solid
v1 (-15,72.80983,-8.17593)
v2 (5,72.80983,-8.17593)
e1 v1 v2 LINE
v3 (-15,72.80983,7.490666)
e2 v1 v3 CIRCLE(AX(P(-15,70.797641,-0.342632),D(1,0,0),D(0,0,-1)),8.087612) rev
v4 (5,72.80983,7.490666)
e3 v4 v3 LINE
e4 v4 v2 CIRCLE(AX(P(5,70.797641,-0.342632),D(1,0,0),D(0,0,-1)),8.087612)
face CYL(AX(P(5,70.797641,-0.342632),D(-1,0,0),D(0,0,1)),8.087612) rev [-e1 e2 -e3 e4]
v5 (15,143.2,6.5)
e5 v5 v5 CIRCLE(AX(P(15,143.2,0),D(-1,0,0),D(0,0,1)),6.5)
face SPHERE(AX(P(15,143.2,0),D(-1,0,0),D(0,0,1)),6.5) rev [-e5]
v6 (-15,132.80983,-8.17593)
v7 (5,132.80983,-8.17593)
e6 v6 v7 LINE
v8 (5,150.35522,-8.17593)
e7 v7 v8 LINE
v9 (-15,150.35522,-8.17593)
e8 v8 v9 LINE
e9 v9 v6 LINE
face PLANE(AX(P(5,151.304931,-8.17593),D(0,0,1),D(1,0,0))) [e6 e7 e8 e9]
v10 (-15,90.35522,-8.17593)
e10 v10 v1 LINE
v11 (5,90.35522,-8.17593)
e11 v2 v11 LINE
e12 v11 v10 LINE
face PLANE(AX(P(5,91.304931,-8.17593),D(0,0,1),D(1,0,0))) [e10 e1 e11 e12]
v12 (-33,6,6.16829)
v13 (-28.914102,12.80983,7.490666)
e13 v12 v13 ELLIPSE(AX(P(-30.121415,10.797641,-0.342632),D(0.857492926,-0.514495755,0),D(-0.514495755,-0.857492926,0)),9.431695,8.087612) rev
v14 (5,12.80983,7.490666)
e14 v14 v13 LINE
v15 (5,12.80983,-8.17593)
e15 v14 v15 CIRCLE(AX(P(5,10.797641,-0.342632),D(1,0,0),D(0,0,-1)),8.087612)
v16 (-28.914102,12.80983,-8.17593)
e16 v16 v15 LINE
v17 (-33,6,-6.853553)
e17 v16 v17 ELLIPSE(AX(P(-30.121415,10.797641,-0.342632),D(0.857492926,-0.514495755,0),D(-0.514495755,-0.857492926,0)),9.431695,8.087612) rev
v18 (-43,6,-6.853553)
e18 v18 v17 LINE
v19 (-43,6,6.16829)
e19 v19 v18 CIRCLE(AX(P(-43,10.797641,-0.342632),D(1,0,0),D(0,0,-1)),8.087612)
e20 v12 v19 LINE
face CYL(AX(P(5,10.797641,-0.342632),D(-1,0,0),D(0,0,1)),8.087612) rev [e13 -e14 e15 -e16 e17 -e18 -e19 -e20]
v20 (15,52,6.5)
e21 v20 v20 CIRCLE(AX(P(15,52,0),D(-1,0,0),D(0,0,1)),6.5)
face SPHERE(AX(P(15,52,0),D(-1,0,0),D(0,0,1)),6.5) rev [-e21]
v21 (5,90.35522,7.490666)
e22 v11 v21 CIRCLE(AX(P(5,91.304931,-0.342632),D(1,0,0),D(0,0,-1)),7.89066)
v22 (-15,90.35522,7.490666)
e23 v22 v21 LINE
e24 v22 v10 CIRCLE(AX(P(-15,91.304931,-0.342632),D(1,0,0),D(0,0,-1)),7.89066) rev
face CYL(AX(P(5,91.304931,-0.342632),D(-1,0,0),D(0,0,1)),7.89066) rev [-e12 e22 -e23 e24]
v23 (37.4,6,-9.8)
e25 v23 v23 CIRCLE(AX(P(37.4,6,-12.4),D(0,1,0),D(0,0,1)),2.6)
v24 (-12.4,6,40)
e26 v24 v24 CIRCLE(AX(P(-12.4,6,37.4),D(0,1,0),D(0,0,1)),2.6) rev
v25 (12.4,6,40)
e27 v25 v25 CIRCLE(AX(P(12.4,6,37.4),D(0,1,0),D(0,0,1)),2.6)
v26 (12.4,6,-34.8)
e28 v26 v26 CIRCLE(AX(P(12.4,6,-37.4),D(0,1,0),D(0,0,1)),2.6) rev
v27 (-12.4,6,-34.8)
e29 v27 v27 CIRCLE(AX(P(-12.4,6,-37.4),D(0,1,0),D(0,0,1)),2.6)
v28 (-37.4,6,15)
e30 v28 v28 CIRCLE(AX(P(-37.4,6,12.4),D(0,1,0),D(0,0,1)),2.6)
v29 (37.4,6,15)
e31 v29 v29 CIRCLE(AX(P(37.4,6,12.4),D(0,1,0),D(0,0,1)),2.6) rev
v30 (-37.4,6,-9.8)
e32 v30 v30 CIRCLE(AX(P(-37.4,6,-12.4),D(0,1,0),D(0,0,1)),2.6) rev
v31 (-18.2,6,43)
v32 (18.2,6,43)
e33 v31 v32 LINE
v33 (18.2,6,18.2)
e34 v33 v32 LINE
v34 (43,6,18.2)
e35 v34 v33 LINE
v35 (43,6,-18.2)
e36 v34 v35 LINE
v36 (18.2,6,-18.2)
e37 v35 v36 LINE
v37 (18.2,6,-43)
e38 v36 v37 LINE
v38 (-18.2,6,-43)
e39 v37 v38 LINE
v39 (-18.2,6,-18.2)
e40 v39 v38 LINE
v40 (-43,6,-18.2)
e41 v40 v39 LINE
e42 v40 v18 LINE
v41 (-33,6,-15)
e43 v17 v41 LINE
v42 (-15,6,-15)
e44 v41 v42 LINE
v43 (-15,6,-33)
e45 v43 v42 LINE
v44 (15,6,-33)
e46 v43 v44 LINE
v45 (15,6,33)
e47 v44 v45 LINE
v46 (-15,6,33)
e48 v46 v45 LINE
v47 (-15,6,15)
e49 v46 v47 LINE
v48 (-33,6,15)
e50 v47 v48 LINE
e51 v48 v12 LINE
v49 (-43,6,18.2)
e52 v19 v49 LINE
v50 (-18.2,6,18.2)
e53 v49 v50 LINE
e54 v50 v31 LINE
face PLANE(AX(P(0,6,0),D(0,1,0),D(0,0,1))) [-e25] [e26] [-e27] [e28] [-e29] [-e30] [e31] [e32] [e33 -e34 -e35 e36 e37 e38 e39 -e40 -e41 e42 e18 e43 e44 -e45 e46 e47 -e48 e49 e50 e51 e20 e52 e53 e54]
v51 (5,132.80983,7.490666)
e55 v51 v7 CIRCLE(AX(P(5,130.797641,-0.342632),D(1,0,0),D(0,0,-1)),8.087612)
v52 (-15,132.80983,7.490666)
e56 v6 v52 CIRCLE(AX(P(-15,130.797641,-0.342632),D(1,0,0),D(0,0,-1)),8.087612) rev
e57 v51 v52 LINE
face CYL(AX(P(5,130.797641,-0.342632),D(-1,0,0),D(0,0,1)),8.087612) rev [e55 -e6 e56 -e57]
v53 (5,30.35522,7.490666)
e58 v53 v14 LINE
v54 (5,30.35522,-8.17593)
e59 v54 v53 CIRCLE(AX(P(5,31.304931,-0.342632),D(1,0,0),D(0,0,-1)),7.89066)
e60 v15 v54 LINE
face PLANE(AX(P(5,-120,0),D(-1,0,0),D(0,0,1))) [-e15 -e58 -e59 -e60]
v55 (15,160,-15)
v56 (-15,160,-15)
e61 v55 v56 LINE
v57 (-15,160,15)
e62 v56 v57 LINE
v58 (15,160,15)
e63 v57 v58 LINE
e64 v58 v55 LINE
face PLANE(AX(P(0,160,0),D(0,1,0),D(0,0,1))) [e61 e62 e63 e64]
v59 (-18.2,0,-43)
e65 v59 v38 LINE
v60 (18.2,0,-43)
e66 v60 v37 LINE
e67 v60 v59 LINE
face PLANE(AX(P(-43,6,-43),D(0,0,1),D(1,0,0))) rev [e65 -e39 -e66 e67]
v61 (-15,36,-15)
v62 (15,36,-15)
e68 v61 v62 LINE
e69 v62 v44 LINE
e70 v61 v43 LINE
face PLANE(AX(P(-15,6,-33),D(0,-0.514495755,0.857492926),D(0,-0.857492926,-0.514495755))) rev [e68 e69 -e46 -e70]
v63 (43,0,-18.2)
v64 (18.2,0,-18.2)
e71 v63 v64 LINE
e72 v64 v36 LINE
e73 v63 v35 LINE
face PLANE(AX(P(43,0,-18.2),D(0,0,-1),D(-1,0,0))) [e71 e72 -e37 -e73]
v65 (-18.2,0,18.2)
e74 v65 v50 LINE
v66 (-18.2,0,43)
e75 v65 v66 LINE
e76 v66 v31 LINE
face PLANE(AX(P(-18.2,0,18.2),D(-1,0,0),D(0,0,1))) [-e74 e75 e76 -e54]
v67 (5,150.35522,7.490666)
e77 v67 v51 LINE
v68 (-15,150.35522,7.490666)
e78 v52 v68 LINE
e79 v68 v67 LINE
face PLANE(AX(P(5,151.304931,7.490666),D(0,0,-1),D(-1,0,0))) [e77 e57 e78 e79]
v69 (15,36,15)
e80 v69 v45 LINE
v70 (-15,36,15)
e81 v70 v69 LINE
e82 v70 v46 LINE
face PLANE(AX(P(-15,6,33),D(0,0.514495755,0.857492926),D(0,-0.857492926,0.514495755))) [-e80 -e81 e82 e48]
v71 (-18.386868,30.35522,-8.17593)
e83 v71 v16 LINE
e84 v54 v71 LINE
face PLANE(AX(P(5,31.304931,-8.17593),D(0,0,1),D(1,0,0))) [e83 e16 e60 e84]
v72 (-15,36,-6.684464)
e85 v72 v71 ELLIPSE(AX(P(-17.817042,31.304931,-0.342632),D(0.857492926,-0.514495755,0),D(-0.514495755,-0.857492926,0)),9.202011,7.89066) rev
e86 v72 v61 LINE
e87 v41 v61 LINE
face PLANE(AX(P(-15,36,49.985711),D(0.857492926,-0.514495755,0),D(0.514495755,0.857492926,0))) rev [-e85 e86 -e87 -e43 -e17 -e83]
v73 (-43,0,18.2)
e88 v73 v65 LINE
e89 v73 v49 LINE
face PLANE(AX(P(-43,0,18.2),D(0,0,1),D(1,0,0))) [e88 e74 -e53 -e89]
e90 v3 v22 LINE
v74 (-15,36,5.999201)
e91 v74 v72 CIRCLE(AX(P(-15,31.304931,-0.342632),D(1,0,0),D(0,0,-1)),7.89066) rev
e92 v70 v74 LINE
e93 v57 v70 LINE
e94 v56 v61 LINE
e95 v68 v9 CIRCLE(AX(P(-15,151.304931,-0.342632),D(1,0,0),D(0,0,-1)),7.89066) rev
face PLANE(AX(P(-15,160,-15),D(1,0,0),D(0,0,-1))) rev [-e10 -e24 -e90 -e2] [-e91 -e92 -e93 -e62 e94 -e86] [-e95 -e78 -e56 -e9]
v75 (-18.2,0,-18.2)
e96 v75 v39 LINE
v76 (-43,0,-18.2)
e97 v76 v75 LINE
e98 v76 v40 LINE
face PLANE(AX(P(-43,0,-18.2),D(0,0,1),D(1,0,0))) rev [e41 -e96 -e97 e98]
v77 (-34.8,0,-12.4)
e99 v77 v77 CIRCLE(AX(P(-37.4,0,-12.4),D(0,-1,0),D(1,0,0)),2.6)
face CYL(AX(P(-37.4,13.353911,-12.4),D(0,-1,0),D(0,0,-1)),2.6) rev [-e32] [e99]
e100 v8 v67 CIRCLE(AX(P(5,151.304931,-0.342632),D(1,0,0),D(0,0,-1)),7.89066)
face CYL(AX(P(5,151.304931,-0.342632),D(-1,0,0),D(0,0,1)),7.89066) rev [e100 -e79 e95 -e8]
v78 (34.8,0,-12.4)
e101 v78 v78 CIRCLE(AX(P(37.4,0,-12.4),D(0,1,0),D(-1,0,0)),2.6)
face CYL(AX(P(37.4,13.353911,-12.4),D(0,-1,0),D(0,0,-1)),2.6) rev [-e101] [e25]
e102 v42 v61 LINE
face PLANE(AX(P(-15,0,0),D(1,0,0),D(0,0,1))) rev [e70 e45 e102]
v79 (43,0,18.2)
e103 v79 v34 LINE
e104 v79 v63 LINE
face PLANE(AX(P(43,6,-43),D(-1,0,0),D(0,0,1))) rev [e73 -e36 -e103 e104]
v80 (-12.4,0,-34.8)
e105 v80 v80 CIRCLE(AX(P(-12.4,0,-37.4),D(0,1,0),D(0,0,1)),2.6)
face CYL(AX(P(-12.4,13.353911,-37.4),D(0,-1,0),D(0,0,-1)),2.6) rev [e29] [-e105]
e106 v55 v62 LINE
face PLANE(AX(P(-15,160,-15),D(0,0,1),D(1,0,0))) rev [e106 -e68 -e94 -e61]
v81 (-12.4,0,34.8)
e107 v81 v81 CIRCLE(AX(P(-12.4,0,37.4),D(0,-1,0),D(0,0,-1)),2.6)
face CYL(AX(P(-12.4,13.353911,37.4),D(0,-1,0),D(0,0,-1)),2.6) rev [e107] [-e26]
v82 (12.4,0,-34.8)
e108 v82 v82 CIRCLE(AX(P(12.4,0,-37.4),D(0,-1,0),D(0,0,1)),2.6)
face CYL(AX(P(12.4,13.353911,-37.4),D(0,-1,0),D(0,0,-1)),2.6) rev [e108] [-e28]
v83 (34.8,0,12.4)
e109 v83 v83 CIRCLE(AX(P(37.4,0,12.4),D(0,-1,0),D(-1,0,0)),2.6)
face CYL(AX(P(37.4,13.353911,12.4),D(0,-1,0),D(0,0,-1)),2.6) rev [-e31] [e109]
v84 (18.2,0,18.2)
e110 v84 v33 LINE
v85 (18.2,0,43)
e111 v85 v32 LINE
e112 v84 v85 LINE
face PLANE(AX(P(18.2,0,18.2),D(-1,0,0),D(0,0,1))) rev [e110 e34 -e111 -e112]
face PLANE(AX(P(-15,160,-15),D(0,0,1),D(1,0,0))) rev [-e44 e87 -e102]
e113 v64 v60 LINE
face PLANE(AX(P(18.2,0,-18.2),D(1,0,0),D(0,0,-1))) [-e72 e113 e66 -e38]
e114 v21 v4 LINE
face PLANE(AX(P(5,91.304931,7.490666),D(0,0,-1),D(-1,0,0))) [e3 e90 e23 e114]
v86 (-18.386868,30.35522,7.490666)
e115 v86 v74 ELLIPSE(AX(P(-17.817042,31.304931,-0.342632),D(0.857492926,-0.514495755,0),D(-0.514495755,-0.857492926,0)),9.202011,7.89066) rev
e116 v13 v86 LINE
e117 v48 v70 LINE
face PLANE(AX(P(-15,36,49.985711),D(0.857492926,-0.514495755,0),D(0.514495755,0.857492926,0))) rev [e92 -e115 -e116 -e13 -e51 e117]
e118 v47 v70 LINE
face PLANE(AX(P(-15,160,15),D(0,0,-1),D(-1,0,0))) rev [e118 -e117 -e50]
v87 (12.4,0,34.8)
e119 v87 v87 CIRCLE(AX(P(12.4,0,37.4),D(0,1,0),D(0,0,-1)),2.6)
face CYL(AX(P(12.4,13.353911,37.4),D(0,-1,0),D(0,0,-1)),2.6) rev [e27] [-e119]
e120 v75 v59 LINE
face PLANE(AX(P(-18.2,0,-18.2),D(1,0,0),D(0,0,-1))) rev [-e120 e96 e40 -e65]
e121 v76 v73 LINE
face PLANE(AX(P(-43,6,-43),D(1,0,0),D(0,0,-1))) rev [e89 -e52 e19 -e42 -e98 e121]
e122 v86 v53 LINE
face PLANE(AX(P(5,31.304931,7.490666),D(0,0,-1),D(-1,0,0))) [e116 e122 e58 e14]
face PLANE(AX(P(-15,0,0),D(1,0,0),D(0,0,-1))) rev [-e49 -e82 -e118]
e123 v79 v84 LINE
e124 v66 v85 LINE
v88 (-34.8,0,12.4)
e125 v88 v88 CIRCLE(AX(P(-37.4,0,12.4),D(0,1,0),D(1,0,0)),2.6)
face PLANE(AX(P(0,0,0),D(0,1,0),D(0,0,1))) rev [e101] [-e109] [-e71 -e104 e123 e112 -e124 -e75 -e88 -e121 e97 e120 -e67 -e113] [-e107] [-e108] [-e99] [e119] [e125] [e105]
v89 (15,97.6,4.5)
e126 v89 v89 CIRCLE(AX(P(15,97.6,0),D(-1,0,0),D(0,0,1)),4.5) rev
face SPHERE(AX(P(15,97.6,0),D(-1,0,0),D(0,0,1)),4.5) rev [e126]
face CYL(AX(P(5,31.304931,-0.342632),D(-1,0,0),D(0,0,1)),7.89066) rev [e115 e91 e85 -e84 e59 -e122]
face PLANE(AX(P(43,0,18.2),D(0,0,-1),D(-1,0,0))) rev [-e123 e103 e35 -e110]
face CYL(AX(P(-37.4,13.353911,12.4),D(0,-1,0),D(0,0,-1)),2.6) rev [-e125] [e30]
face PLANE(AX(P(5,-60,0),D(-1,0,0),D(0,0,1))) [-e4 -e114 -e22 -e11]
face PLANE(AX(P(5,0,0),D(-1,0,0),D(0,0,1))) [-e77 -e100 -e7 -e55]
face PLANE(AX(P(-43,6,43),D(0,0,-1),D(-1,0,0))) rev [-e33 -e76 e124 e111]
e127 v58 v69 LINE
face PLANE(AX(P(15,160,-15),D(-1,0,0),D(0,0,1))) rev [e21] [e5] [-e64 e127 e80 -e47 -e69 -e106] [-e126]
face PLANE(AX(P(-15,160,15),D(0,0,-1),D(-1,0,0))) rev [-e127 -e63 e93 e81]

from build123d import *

# Parameters (mm, degrees)
SKETCH_1_W                  = 86
SKETCH_1_H                  = 86
EXTRUDE_1_DEPTH             = 6
SKETCH_2_W                  = 30
SKETCH_2_H                  = 30
EXTRUDE_2_DEPTH             = 160
EXTRUDE_3_REACH             = 173.167
EXTRUDE_3_DIRECTION_2_REACH = 173.167
SKETCH_8_R                  = 2.6
CUT_EXTRUDE_2_DEPTH         = 6
CUT_EXTRUDE_3_DEPTH         = 6
PATTERN_LINEAR_1_COUNT      = 2
PATTERN_LINEAR_1_PITCH      = 91.2
MIRROR_7_COPY_1_DEPTH       = 6
MIRROR_8_COPY_1_SKETCH_R    = 2.6
MIRROR_8_COPY_1_DEPTH       = 6
PATTERN_CIRCULAR_1_COUNT    = 2
PATTERN_CIRCULAR_1_ANGLE    = 90
MIRROR_9_COPY_1_SKETCH_R    = 2.6
MIRROR_9_COPY_1_DEPTH       = 6
MIRROR_9_COPY_2_SKETCH_R    = 2.6
MIRROR_9_COPY_2_DEPTH       = 6
MIRROR_10_COPY_1_SKETCH_R   = 2.6
MIRROR_10_COPY_1_DEPTH      = 6
MIRROR_10_COPY_2_SKETCH_R   = 2.6
MIRROR_10_COPY_2_DEPTH      = 6
MIRROR_10_COPY_3_SKETCH_R   = 2.6
MIRROR_10_COPY_3_DEPTH      = 6
MIRROR_10_COPY_4_SKETCH_R   = 2.6
MIRROR_10_COPY_4_DEPTH      = 6
MIRROR_10_COPY_5_SKETCH_R   = 2.6
MIRROR_10_COPY_5_DEPTH      = 6
EXTRUDE_4_DEPTH             = 15
CUT_EXTRUDE_START           = -172.166585524
SKETCH_17_W                 = 15.666596152
SKETCH_17_H                 = 20.507289597
CUT_EXTRUDE_4_DEPTH         = 177.166585524
SKETCH_18_R                 = 7.890659629
SKETCH_18_R_2               = 8.087611604
CUT_EXTRUDE_5_DEPTH         = 177.166585524
PATTERN_START               = -8.175929672
PATTERN_LINEAR_2_OUTLINE_W  = 20
PATTERN_LINEAR_2_OUTLINE_H  = 20.507289597
PATTERN_LINEAR_2_DEPTH      = 15.666596152
PATTERN_LINEAR_3_COUNT      = 3
PATTERN_LINEAR_3_PITCH      = 60


# Read off the part's stored shape, not the designer's step: 阵列(线性)2
with BuildPart() as part:
    # 草图1 → 凸台-拉伸1 (new body)
    with BuildSketch(Plane(origin=(0, 0, 0), x_dir=(1, 0, 0), z_dir=(0, 1, 0))):
        Rectangle(SKETCH_1_W, SKETCH_1_H)
    extrude(amount=EXTRUDE_1_DEPTH)

    # 草图2 → 凸台-拉伸2 (add)
    with BuildSketch(Plane(origin=(0, 0, 0), x_dir=(1, 0, 0), z_dir=(0, 1, 0))):
        Rectangle(SKETCH_2_W, SKETCH_2_H)
    extrude(amount=EXTRUDE_2_DEPTH)

    # 凸台-拉伸3: up to this face of the body (flat: up to its plane)
    extrude_3_end = Plane(part.part.faces().sort_by_distance((0, 83, 15))[0])
    # 草图7 → 凸台-拉伸3 (add, up to the picked face)
    with BuildSketch(Plane.XY, mode=Mode.PRIVATE) as extrude_3_sk1:
        Polygon((-15, 36), (-33, 6), (-15, 6), align=None)
    extrude_3_tool1 = split(extrude(extrude_3_sk1.sketch, amount=EXTRUDE_3_REACH, mode=Mode.PRIVATE), bisect_by=extrude_3_end, keep=Keep.BOTH, mode=Mode.PRIVATE)
    add(extrude_3_tool1.solids().sort_by(Axis((-21, 16, 0), (0, 0, 1)))[0])

    # 凸台-拉伸3 direction 2: up to this face of the body (flat: up to its plane)
    extrude_3_direction_2_end = Plane(part.part.faces().sort_by_distance((0, 83, -15))[0])
    # 草图7 → 凸台-拉伸3 direction 2 (add, up to the picked face)
    with BuildSketch(Plane.XY, mode=Mode.PRIVATE) as extrude_3_direction_2_sk1:
        Polygon((-15, 36), (-33, 6), (-15, 6), align=None)
    extrude_3_direction_2_tool1 = split(extrude(extrude_3_direction_2_sk1.sketch, amount=-EXTRUDE_3_DIRECTION_2_REACH, mode=Mode.PRIVATE), bisect_by=extrude_3_direction_2_end, keep=Keep.BOTH, mode=Mode.PRIVATE)
    add(extrude_3_direction_2_tool1.solids().sort_by(Axis((-21, 16, 0), (0, 0, -1)))[0])

    # 草图8 → 切除-拉伸2 (cut)
    with BuildSketch(Plane(origin=(0, 0, 0), x_dir=(1, 0, 0), z_dir=(0, 1, 0))):
        with Locations(Location((-12.4, 37.4, 0), (0, 0, 270))):
            Circle(SKETCH_8_R)
    cut_extrude_2 = extrude(amount=CUT_EXTRUDE_2_DEPTH, mode=Mode.SUBTRACT)

    # 镜向2: 切除-拉伸2 across plane
    add(cut_extrude_2.mirror(Plane.XY), mode=Mode.SUBTRACT)

    # 草图11 → 切除-拉伸3 (cut)
    with BuildSketch(Plane(origin=(0, 0, 0), x_dir=(1, 0, 0), z_dir=(0, 1, 0))):
        Polygon((264.106039705, -18.2), (43, -18.2), (18.2, -18.2), (18.2, -43), (18.2, -264.106039705), (330.891160074, -576.797199779), (576.797199779, -330.891160074), align=None)
    cut_extrude_3 = extrude(amount=CUT_EXTRUDE_3_DEPTH, mode=Mode.SUBTRACT)

    # 草图12 → 切除-旋转2 (revolve, cut)
    with BuildSketch(Plane.XY):
        with BuildLine():
            Line((15, 58.5), (15, 45.5))
            ThreePointArc((15, 45.5), (8.5, 52), (15, 58.5))
        make_face()
    cut_revolve_2 = revolve(axis=Axis((15, 58.5, 0), (0, -1, 0)), mode=Mode.SUBTRACT)

    # 阵列(线性)1: 切除-旋转2 ×2
    with Locations(*[(0, i * PATTERN_LINEAR_1_PITCH, 0) for i in range(1, PATTERN_LINEAR_1_COUNT)]):
        add(cut_revolve_2, mode=Mode.SUBTRACT)

    # 镜向6: 切除-拉伸3 across plane
    add(cut_extrude_3.mirror(Plane.XY), mode=Mode.SUBTRACT)

    # 镜向7: 切除-拉伸3 across plane
    add(cut_extrude_3.mirror(Plane(origin=(0, 0, 0), x_dir=(0, 0, 1), z_dir=(1, 0, 0))), mode=Mode.SUBTRACT)

    # 镜向7 copy 1 sketch → 镜向7 copy 1 (cut)
    with BuildSketch(Plane(origin=(0, 0, 0), x_dir=(-1, 0, 0), z_dir=(0, 1, 0))):
        Polygon((264.106039705, -18.2), (43, -18.2), (18.2, -18.2), (18.2, -43), (18.2, -264.106039705), (330.891160074, -576.797199779), (576.797199779, -330.891160074), align=None)
    extrude(amount=MIRROR_7_COPY_1_DEPTH, mode=Mode.SUBTRACT)

    # 镜向8: 切除-拉伸2 across plane
    add(cut_extrude_2.mirror(Plane(origin=(0, 0, 0), x_dir=(0, 0, 1), z_dir=(1, 0, 0))), mode=Mode.SUBTRACT)

    # 镜向8 copy 1 sketch → 镜向8 copy 1 (cut)
    with BuildSketch(Plane(origin=(0, 0, 0), x_dir=(-1, 0, 0), z_dir=(0, 1, 0))):
        with Locations(Location((-12.4, 37.4, 0), (0, 0, 270))):
            Circle(MIRROR_8_COPY_1_SKETCH_R)
    extrude(amount=MIRROR_8_COPY_1_DEPTH, mode=Mode.SUBTRACT)

    # 阵列(圆周)1: 切除-拉伸2 ×2 about axis
    pattern_circular_1_axis = Axis((0, 0, 0), (0, 1, 0))
    for i in range(1, PATTERN_CIRCULAR_1_COUNT):
        add(cut_extrude_2.rotate(pattern_circular_1_axis, i * PATTERN_CIRCULAR_1_ANGLE / (PATTERN_CIRCULAR_1_COUNT - 1)), mode=Mode.SUBTRACT)

    # 镜向9 copy 1 sketch → 镜向9 copy 1 (cut)
    with BuildSketch(Plane.ZX):
        with Locations((-12.4, -37.4)):
            Circle(MIRROR_9_COPY_1_SKETCH_R)
    extrude(amount=MIRROR_9_COPY_1_DEPTH, mode=Mode.SUBTRACT)

    # 镜向9 copy 2 sketch → 镜向9 copy 2 (cut)
    with BuildSketch(Plane(origin=(0, 0, 0), x_dir=(1, 0, 0), z_dir=(0, 1, 0))):
        with Locations((-12.4, -37.4)):
            Circle(MIRROR_9_COPY_2_SKETCH_R)
    extrude(amount=MIRROR_9_COPY_2_DEPTH, mode=Mode.SUBTRACT)

    # 镜向10 copy 1 sketch → 镜向10 copy 1 (cut)
    with BuildSketch(Plane(origin=(0, 0, 0), x_dir=(0, 0, -1), z_dir=(0, 1, 0))):
        with Locations((-12.4, -37.4)):
            Circle(MIRROR_10_COPY_1_SKETCH_R)
    extrude(amount=MIRROR_10_COPY_1_DEPTH, mode=Mode.SUBTRACT)

    # 镜向10 copy 2 sketch → 镜向10 copy 2 (cut)
    with BuildSketch(Plane(origin=(0, 0, 0), x_dir=(-1, 0, 0), z_dir=(0, 1, 0))):
        with Locations((-12.4, -37.4)):
            Circle(MIRROR_10_COPY_2_SKETCH_R)
    extrude(amount=MIRROR_10_COPY_2_DEPTH, mode=Mode.SUBTRACT)

    # 镜向10 copy 3 sketch → 镜向10 copy 3 (cut)
    with BuildSketch(Plane.ZX):
        with Locations(Location((-12.4, 37.4, 0), (0, 0, 270))):
            Circle(MIRROR_10_COPY_3_SKETCH_R)
    extrude(amount=MIRROR_10_COPY_3_DEPTH, mode=Mode.SUBTRACT)

    # 镜向10 copy 4 sketch → 镜向10 copy 4 (cut)
    with BuildSketch(Plane(origin=(0, 0, 0), x_dir=(-1, 0, 0), z_dir=(0, 1, 0))):
        with Locations(Location((-12.4, 37.4, 0), (0, 0, 270))):
            Circle(MIRROR_10_COPY_4_SKETCH_R)
    extrude(amount=MIRROR_10_COPY_4_DEPTH, mode=Mode.SUBTRACT)

    # 镜向10 copy 5 sketch → 镜向10 copy 5 (cut)
    with BuildSketch(Plane(origin=(0, 0, 0), x_dir=(-1, 0, 0), z_dir=(0, 1, 0))):
        with Locations((-12.4, -37.4)):
            Circle(MIRROR_10_COPY_5_SKETCH_R)
    extrude(amount=MIRROR_10_COPY_5_DEPTH, mode=Mode.SUBTRACT)

    # 草图15 → 凸台-拉伸4 (add, symmetric)
    with BuildSketch(Plane(origin=(0, 0, 0), x_dir=(0, 0, -1), z_dir=(1, 0, 0))):
        Polygon((-15, 36), (-15, 6), (-33, 6), align=None)
    extrude_4 = extrude(amount=EXTRUDE_4_DEPTH, both=True)

    # 镜向11: 凸台-拉伸4 across plane
    add(extrude_4.mirror(Plane.XY))

    # 草图16 → 切除-旋转3 (revolve, cut)
    with BuildSketch(Plane.XY):
        with BuildLine():
            Line((15, 102.1), (15, 93.1))
            ThreePointArc((15, 93.1), (19.5, 97.6), (15, 102.1))
        make_face()
    revolve(axis=Axis((15, 102.1, 0), (0, -1, 0)), mode=Mode.SUBTRACT)

    # 草图17 → 切除-拉伸4 (cut)
    with BuildSketch(Plane(origin=(0, 0, 0), x_dir=(0, 0, -1), z_dir=(1, 0, 0)).offset(CUT_EXTRUDE_START)):
        with Locations((0.342631596, 141.05128602)):
            Rectangle(SKETCH_17_W, SKETCH_17_H)
    extrude(amount=CUT_EXTRUDE_4_DEPTH, mode=Mode.SUBTRACT)

    # 草图18 → 切除-拉伸5 (cut)
    with BuildSketch(Plane(origin=(0, 0, 0), x_dir=(0, 0, -1), z_dir=(1, 0, 0)).offset(CUT_EXTRUDE_START)):
        with Locations((0.342631596, 151.304930818)):
            Circle(SKETCH_18_R)
        with Locations((0.342631596, 130.797641221)):
            Circle(SKETCH_18_R_2)
    cut_extrude_5 = extrude(amount=CUT_EXTRUDE_5_DEPTH, mode=Mode.SUBTRACT)

    # 阵列(线性)2 outline → 阵列(线性)2 (cut)
    with BuildSketch(Plane.XY.offset(PATTERN_START)):
        with Locations((-5, 81.051286019)):
            Rectangle(PATTERN_LINEAR_2_OUTLINE_W, PATTERN_LINEAR_2_OUTLINE_H)
        Polygon((5, 10.797641221), (5, 31.304930818), (-17.817041509, 31.304930818), (-30.121415267, 10.797641221), align=None)
    extrude(amount=PATTERN_LINEAR_2_DEPTH, mode=Mode.SUBTRACT)

    # 阵列(线性)3: 切除-拉伸5 ×3
    with Locations(*[(0, -i * PATTERN_LINEAR_3_PITCH, 0) for i in range(1, PATTERN_LINEAR_3_COUNT)]):
        add(cut_extrude_5, mode=Mode.SUBTRACT)


solid = part.part
